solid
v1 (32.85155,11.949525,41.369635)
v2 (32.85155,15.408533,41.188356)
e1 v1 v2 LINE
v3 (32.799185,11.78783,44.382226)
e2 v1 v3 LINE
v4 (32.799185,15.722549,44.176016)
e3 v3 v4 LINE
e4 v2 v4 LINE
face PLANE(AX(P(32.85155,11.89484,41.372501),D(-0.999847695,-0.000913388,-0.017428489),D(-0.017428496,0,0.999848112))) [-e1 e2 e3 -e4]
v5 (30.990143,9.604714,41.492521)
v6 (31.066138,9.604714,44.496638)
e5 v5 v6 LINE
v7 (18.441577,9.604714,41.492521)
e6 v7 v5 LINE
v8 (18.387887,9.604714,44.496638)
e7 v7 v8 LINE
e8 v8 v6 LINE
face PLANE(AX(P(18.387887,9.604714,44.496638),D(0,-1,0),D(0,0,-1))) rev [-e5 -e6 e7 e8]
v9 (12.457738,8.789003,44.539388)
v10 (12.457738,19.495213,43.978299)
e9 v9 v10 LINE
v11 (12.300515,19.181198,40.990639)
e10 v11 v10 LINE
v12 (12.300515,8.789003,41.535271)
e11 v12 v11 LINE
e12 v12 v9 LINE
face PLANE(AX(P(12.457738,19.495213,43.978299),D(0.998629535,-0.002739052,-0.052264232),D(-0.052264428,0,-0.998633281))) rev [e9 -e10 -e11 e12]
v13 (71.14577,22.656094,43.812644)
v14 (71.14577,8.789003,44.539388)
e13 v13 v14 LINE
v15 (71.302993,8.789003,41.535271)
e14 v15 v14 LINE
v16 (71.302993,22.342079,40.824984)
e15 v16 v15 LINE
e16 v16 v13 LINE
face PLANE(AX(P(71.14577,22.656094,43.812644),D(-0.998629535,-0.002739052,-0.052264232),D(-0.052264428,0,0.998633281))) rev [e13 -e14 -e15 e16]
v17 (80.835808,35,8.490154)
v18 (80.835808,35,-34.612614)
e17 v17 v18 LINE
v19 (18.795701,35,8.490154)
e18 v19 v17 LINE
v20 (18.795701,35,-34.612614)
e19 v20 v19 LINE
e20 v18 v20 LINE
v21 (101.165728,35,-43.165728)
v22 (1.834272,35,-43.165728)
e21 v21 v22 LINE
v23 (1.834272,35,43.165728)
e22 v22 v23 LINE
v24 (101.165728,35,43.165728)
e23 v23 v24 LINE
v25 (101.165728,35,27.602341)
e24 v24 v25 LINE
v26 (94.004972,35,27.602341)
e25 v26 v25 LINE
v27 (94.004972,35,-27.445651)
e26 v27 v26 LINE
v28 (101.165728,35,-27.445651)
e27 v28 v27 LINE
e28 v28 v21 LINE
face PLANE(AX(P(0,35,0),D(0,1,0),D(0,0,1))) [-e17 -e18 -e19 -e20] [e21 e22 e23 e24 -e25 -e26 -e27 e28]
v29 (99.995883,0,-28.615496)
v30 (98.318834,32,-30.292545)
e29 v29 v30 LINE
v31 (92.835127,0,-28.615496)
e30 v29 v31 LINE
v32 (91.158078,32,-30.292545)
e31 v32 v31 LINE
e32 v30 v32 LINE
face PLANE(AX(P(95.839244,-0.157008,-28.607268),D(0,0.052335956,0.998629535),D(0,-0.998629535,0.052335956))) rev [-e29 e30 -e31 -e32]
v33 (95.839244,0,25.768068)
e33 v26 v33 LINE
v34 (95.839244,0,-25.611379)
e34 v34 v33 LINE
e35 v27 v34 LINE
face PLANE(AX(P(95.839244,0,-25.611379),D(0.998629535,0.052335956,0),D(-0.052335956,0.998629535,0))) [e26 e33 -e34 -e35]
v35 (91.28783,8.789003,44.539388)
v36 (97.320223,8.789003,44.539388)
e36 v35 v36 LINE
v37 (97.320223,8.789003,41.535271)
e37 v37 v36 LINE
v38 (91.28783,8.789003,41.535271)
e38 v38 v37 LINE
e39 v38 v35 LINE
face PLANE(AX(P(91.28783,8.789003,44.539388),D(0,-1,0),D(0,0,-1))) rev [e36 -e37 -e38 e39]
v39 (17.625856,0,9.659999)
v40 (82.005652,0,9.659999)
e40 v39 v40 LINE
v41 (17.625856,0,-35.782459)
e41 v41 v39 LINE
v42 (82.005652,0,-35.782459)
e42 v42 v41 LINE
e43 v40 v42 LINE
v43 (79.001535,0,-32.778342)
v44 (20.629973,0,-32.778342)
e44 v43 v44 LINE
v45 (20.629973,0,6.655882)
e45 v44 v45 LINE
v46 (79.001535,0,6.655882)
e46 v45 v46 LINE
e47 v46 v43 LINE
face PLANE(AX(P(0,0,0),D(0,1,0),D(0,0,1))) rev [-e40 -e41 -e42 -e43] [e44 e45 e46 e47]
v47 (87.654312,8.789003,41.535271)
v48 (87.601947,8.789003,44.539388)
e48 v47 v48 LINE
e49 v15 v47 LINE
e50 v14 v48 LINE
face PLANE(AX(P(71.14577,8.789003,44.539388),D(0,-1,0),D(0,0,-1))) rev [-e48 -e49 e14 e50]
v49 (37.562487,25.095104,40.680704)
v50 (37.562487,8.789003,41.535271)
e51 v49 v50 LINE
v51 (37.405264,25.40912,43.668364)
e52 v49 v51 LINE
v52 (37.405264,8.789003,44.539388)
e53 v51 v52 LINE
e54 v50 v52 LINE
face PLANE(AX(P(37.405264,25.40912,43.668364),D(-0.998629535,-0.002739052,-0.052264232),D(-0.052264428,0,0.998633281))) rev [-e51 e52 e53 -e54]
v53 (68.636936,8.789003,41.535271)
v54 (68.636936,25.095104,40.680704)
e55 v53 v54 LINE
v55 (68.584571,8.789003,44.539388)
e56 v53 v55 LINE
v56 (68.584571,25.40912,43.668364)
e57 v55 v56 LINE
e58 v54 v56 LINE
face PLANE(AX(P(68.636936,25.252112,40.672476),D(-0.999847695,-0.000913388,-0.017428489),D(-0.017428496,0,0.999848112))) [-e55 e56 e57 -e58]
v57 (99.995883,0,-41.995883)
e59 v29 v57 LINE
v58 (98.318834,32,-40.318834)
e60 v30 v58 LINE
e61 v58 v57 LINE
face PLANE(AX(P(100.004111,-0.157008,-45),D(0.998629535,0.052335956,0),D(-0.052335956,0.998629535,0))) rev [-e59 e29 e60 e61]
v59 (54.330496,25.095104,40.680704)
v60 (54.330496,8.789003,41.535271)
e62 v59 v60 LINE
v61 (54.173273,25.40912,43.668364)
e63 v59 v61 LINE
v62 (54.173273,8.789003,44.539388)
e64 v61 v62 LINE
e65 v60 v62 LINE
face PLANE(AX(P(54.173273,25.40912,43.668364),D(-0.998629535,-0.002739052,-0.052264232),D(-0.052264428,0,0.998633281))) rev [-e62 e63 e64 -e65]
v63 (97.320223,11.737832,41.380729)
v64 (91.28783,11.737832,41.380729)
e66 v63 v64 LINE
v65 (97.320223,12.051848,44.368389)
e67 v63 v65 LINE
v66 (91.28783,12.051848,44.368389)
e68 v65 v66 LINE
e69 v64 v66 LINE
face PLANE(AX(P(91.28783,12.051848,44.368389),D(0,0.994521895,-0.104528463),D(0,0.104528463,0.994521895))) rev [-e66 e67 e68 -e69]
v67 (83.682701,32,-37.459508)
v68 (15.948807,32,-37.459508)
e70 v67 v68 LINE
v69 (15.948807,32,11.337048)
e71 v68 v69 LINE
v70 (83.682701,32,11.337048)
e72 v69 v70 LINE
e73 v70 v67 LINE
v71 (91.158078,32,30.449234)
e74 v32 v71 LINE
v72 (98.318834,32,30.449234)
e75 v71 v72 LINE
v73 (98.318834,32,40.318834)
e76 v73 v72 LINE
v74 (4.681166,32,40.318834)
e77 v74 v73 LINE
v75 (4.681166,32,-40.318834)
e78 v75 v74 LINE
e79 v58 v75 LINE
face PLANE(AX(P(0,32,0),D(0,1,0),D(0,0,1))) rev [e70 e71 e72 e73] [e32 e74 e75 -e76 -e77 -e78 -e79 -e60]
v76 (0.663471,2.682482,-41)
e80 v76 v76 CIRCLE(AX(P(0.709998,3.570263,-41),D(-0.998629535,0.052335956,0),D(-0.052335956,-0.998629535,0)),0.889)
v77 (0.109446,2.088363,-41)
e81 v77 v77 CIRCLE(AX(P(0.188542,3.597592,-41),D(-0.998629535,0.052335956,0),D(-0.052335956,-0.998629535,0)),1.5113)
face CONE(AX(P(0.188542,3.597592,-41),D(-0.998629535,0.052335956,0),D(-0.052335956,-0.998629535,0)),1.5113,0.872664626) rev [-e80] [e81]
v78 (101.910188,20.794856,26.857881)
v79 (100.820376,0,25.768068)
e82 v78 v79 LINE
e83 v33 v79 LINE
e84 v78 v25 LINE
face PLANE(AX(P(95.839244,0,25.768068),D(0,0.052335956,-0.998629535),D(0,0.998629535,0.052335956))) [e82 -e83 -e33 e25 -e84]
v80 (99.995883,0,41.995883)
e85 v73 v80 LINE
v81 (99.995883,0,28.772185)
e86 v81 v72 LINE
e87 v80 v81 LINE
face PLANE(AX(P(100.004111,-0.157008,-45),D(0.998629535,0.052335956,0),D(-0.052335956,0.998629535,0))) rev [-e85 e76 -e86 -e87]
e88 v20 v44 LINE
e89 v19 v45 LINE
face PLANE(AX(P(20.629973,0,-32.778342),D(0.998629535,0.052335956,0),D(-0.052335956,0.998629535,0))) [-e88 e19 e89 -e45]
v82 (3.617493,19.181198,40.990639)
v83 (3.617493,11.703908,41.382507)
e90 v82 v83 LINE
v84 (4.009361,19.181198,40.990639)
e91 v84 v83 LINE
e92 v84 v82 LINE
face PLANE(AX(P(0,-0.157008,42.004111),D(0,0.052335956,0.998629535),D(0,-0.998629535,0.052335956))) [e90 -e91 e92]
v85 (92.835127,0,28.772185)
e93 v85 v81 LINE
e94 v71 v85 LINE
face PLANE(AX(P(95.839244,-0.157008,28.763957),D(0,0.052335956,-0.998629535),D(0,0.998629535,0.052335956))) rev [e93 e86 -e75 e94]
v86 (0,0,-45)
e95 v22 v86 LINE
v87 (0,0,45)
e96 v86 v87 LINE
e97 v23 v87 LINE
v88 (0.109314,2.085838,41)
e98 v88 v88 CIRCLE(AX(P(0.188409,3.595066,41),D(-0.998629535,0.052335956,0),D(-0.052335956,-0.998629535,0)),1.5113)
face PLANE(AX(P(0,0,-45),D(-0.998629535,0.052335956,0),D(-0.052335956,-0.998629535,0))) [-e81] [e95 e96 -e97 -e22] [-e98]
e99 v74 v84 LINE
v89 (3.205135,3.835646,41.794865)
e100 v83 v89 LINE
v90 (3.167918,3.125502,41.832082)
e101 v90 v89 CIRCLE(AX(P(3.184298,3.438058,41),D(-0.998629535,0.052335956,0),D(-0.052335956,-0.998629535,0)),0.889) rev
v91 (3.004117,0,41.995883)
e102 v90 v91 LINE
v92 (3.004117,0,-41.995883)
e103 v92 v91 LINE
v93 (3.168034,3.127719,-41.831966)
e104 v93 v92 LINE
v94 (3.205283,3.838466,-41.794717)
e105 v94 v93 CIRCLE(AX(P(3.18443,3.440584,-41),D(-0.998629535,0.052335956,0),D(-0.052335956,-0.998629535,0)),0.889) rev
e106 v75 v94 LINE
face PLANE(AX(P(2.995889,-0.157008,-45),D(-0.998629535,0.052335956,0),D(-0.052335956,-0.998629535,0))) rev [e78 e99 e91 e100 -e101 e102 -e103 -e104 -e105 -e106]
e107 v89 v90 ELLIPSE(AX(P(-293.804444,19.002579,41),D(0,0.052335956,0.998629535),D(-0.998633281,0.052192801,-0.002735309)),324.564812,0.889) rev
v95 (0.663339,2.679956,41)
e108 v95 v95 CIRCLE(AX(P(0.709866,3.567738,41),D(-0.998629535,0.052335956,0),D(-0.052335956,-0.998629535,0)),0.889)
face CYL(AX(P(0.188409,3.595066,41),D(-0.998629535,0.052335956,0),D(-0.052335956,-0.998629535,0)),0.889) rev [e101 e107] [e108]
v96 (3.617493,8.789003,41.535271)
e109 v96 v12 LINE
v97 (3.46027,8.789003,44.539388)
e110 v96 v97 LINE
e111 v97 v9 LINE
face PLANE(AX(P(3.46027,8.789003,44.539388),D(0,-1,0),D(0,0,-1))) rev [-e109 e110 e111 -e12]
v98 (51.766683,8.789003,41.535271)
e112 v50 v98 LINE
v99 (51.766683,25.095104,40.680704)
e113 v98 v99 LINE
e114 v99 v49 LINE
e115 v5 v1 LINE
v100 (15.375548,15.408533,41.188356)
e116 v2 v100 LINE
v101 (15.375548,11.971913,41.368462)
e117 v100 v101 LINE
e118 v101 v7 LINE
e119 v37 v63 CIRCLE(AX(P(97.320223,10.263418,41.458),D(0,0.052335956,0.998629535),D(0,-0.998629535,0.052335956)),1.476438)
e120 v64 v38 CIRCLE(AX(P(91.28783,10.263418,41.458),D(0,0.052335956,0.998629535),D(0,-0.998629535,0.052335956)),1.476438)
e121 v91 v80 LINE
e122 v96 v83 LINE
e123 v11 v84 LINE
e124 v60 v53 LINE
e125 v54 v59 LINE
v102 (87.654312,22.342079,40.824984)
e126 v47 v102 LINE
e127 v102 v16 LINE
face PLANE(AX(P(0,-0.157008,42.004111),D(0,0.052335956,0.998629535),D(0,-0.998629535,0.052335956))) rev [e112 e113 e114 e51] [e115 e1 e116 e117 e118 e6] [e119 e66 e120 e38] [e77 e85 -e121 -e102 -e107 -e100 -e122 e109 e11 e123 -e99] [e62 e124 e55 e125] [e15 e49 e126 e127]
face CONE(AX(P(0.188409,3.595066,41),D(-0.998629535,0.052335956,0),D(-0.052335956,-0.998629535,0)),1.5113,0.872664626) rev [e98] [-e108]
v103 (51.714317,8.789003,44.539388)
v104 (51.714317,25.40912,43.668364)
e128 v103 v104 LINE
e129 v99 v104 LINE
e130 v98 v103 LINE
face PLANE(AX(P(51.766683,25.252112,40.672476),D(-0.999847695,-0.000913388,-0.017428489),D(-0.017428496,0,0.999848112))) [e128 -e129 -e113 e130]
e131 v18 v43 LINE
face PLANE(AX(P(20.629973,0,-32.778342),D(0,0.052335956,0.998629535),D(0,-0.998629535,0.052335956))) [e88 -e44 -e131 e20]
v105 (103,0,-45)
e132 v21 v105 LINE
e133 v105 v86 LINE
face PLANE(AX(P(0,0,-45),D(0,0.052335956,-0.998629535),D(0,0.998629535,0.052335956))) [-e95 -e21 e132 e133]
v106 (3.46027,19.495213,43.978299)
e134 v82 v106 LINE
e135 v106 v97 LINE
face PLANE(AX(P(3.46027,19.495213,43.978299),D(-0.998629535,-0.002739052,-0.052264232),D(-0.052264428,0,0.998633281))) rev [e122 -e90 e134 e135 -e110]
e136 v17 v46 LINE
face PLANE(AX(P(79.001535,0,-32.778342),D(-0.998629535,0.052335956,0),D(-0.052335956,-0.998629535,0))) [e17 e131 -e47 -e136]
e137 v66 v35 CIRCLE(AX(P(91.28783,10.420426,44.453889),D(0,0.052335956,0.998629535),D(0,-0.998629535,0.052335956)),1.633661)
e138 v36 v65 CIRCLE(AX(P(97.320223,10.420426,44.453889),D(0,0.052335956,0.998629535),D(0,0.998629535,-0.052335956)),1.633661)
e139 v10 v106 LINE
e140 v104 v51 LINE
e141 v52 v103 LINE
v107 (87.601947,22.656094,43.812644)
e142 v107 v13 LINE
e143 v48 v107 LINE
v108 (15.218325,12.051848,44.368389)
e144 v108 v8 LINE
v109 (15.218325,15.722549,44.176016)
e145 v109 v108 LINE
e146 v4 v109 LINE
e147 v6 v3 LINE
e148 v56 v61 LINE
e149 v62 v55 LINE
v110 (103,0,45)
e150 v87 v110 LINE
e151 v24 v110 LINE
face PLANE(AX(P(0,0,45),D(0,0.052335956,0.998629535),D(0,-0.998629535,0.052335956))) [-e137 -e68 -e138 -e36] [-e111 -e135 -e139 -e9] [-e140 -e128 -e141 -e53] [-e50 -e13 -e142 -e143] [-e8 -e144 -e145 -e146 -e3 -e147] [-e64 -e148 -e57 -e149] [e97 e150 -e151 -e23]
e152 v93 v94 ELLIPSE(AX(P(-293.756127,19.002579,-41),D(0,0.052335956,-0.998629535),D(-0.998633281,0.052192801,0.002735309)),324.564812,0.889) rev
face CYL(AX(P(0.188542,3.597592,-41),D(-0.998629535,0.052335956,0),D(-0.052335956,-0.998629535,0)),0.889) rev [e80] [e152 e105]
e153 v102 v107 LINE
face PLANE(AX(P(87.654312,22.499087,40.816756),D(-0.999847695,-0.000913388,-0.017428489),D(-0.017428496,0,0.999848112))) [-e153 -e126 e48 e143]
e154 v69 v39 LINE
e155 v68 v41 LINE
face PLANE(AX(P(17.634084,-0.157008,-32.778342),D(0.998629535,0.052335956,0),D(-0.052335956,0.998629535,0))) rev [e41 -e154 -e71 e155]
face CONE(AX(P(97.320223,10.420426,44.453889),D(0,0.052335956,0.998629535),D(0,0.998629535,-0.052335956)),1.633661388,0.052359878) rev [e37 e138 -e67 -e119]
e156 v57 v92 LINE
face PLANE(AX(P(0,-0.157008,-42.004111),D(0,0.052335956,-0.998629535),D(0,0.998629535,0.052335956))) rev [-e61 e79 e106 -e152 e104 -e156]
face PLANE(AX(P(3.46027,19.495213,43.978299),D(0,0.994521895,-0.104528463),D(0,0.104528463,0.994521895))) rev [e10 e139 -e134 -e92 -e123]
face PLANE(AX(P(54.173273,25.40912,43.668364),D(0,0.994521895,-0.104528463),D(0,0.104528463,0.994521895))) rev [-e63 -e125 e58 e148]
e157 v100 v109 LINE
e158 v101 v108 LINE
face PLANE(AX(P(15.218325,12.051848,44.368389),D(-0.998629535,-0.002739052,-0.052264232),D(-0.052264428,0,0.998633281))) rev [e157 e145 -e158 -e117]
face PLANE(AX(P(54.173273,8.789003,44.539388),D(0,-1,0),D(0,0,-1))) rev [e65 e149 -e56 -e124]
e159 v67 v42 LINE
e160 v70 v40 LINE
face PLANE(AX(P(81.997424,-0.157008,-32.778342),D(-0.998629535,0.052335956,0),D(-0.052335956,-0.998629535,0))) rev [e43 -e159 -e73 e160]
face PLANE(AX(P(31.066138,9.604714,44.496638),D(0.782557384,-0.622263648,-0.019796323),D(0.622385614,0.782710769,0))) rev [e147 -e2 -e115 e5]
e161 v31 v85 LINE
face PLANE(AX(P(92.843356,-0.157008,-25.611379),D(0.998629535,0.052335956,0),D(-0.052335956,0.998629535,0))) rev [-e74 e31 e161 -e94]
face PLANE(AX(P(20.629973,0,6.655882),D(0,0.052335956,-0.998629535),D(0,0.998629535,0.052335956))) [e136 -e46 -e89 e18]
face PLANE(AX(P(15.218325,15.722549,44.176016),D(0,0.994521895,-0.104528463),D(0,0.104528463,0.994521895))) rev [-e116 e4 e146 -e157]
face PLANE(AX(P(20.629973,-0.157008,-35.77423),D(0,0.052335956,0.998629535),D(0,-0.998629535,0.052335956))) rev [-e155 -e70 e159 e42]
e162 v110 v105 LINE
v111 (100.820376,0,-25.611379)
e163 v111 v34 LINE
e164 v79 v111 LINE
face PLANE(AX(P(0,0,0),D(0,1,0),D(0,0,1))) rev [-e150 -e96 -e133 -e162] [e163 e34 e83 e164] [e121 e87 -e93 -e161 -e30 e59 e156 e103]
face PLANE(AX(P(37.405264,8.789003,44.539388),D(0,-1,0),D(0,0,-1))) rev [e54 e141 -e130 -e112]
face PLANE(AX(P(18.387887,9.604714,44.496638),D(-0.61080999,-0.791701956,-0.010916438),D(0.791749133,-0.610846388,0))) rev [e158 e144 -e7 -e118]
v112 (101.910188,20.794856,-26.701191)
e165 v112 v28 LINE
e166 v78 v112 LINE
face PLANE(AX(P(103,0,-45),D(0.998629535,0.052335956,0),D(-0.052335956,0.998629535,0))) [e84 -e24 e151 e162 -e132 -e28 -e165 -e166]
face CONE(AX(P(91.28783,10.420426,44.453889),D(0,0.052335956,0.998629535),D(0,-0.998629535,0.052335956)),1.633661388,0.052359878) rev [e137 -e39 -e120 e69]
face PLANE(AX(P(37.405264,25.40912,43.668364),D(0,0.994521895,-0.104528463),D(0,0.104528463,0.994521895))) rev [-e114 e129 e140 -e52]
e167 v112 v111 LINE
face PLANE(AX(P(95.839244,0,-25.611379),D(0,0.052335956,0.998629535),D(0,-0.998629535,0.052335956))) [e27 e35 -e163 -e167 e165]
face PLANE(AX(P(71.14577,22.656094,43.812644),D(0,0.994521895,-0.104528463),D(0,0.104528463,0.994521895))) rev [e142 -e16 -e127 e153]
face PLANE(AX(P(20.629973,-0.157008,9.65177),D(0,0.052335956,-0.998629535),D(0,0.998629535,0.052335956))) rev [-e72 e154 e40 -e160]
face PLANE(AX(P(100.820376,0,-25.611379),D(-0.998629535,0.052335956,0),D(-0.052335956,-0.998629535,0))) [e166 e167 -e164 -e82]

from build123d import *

# Parameters (mm, degrees)
SKETCH2_W                                         = 103
SKETCH2_H                                         = 90
SKETCH2_W_2                                       = 4.981131341
SKETCH2_H_2                                       = 51.379447355
SKETCH2_W_3                                       = 58.371562284
SKETCH2_H_3                                       = 39.434223375
BOSS_EXTRUDE2_DEPTH                               = 35
BOSS_EXTRUDE2_TAPER                               = 3
SHELL2_OUTLINE_W                                  = 67.733894234
SHELL2_OUTLINE_H                                  = 48.796555325
SHELL2_DEPTH                                      = 32
SHELL2_DRAFT                                      = 3
SKETCH11_W                                        = 8.997468353
SKETCH11_H                                        = 10.72090286
CUT_EXTRUDE2_DEPTH                                = 3
CUT_EXTRUDE2_DRAFT                                = -3
SKETCH11_W_2                                      = 14.518642115
SKETCH11_H_2                                      = 16.642925392
CUT_EXTRUDE2_PROFILE_2_DEPTH                      = 3
CUT_EXTRUDE2_PROFILE_2_DRAFT                      = -3
SKETCH11_W_3                                      = 14.620886073
CUT_EXTRUDE2_PROFILE_3_DEPTH                      = 3
CUT_EXTRUDE2_PROFILE_3_DRAFT                      = -3
SKETCH11_W_4                                      = 16.665765244
SKETCH11_H_3                                      = 13.8861218
CUT_EXTRUDE2_PROFILE_4_DEPTH                      = 3
CUT_EXTRUDE2_PROFILE_4_DRAFT                      = -3
CUT_EXTRUDE2_PROFILE_5_DEPTH                      = 3
CUT_EXTRUDE2_PROFILE_5_DRAFT                      = -3
CUT_EXTRUDE2_PROFILE_6_DEPTH                      = 3
CUT_EXTRUDE2_PROFILE_6_DRAFT                      = -3
CSK_FOR_0_FLAT_HEAD_MACHINE_SCREW_100_D           = 1.778
CSK_FOR_0_FLAT_HEAD_MACHINE_SCREW_100_CSINK_D     = 3.0226
CSK_FOR_0_FLAT_HEAD_MACHINE_SCREW_100_CSINK_ANGLE = 100
CSK_FOR_0_FLAT_HEAD_MACHINE_SCREW_2_D             = 1.778
CSK_FOR_0_FLAT_HEAD_MACHINE_SCREW_2_CSINK_D       = 3.0226
CSK_FOR_0_FLAT_HEAD_MACHINE_SCREW_2_CSINK_ANGLE   = 100
DRAFT4_START                                      = 5
DRAFT4_DEPTH                                      = 19


with BuildPart() as part:
    # Sketch2 → Boss-Extrude2 (new body)
    with BuildSketch(Plane(origin=(0, 0, 0), x_dir=(1, 0, 0), z_dir=(0, 1, 0))):
        with Locations((51.5, 0)):
            Rectangle(SKETCH2_W, SKETCH2_H)
        with Locations((98.329809834, -0.07834477)):
            Rectangle(SKETCH2_W_2, SKETCH2_H_2, mode=Mode.SUBTRACT)
        with Locations((49.815754183, 13.061230018)):
            Rectangle(SKETCH2_W_3, SKETCH2_H_3, mode=Mode.SUBTRACT)
    extrude(amount=BOSS_EXTRUDE2_DEPTH, taper=BOSS_EXTRUDE2_TAPER)


with BuildPart() as shell2_tool:
    # Shell2: read off the stored shape, not the designer's step
    # Shell2 outline → Shell2 (with draft: the straight prism first)
    with BuildSketch(Plane(origin=(0, 32, 0), x_dir=(1, 0, 0), z_dir=(0, 1, 0))):
        Polygon((98.318834025, -30.449234423), (91.158078188, -30.449234423), (91.158078188, 30.292544882), (98.318834025, 30.292544882), (98.318834025, 40.318834025), (4.681165975, 40.318834025), (4.681165975, -40.318834025), (98.318834025, -40.318834025), align=None)
        with Locations((49.815754183, 13.061230019)):
            Rectangle(SHELL2_OUTLINE_W, SHELL2_OUTLINE_H, mode=Mode.SUBTRACT)
    extrude(amount=-SHELL2_DEPTH)
    # Shell2: the draft: its side faces are tilted about the plane it starts from
    shell2_sides = [shell2_tool.faces().sort_by_distance(p)[0] for p in [
        (94.738456106, 16, 30.449234423),
        (91.158078188, 16, 0.07834477),
        (94.738456107, 16, -30.292544882),
        (98.318834025, 16, -35.305689454),
        (51.5, 16, -40.318834025),
        (4.681165975, 16, 0),
        (51.5, 16, 40.318834025),
        (98.318834025, 16, 35.384034224),
        (15.948807066, 16, -13.061230018),
        (49.815754183, 16, -37.459507681),
        (83.6827013, 16, -13.061230018),
        (49.815754183, 16, 11.337047644),
    ]]
    draft(shell2_sides, Plane(origin=(0, 32, 0), x_dir=(1, 0, 0), z_dir=(0, 1, 0)), SHELL2_DRAFT)


with BuildPart() as part_1:
    add(part.part)

    # Shell2: cut by shell2_tool
    add(shell2_tool.part, mode=Mode.SUBTRACT)


with BuildPart() as cut_extrude2_tool:
    # Sketch11 → Cut-Extrude2 (with draft: the straight prism first)
    with BuildSketch(Plane(origin=(0, 2.351890424, 44.876742646), x_dir=(1, 0, 0), z_dir=(0, 0.0523359562429439, 0.998629534754574))):
        with Locations((7.959003718, 11.806398056)):
            Rectangle(SKETCH11_W, SKETCH11_H)
    extrude(amount=-CUT_EXTRUDE2_DEPTH)
    # Cut-Extrude2: the draft: its side faces are tilted about the plane it starts from
    cut_extrude2_sides = [cut_extrude2_tool.faces().sort_by_distance(p)[0] for p in [
        (3.460269541, 14.063604287, 42.760899212),
        (7.959003718, 8.710499169, 43.041443563),
        (12.457737894, 14.063604287, 42.760899212),
        (7.959003718, 19.416709405, 42.48035486),
    ]]
    draft(cut_extrude2_sides, Plane(origin=(0, 2.351890424, 44.876742646), x_dir=(1, 0, 0), z_dir=(0, 0.0523359562429439, 0.998629534754574)), CUT_EXTRUDE2_DRAFT)


with BuildPart() as part_2:
    add(part_1.part)

    # Cut-Extrude2: cut by cut_extrude2_tool
    add(cut_extrude2_tool.part, mode=Mode.SUBTRACT)


with BuildPart() as cut_extrude2_profile_2_tool:
    # Sketch11 → Cut-Extrude2 profile 2 (with draft: the straight prism first)
    with BuildSketch(Plane(origin=(0, 2.351890424, 44.876742646), x_dir=(1, 0, 0), z_dir=(0, 0.0523359562429439, 0.998629534754574))):
        with Locations((44.664584839, 14.767409322)):
            Rectangle(SKETCH11_W_2, SKETCH11_H_2)
    extrude(amount=-CUT_EXTRUDE2_PROFILE_2_DEPTH)
    # Cut-Extrude2 profile 2: the draft: its side faces are tilted about the plane it starts from
    cut_extrude2_profile_2_sides = [cut_extrude2_profile_2_tool.faces().sort_by_distance(p)[0] for p in [
        (37.405263781, 17.02055759, 42.605931856),
        (44.664584839, 8.710499169, 43.041443563),
        (51.923905896, 17.02055759, 42.605931856),
        (44.664584839, 25.330616011, 42.170420148),
    ]]
    draft(cut_extrude2_profile_2_sides, Plane(origin=(0, 2.351890424, 44.876742646), x_dir=(1, 0, 0), z_dir=(0, 0.0523359562429439, 0.998629534754574)), CUT_EXTRUDE2_PROFILE_2_DRAFT)


with BuildPart() as part_3:
    add(part_2.part)

    # Cut-Extrude2 profile 2: cut by cut_extrude2_profile_2_tool
    add(cut_extrude2_profile_2_tool.part, mode=Mode.SUBTRACT)


with BuildPart() as cut_extrude2_profile_3_tool:
    # Sketch11 → Cut-Extrude2 profile 3 (with draft: the straight prism first)
    with BuildSketch(Plane(origin=(0, 2.351890424, 44.876742646), x_dir=(1, 0, 0), z_dir=(0, 0.0523359562429439, 0.998629534754574))):
        with Locations((61.48371602, 14.767409322)):
            Rectangle(SKETCH11_W_3, SKETCH11_H_2)
    extrude(amount=-CUT_EXTRUDE2_PROFILE_3_DEPTH)
    # Cut-Extrude2 profile 3: the draft: its side faces are tilted about the plane it starts from
    cut_extrude2_profile_3_sides = [cut_extrude2_profile_3_tool.faces().sort_by_distance(p)[0] for p in [
        (54.173272984, 17.02055759, 42.605931856),
        (61.483716021, 8.710499169, 43.041443563),
        (68.794159057, 17.02055759, 42.605931856),
        (61.483716021, 25.330616011, 42.170420148),
    ]]
    draft(cut_extrude2_profile_3_sides, Plane(origin=(0, 2.351890424, 44.876742646), x_dir=(1, 0, 0), z_dir=(0, 0.0523359562429439, 0.998629534754574)), CUT_EXTRUDE2_PROFILE_3_DRAFT)


with BuildPart() as part_4:
    add(part_3.part)

    # Cut-Extrude2 profile 3: cut by cut_extrude2_profile_3_tool
    add(cut_extrude2_profile_3_tool.part, mode=Mode.SUBTRACT)


with BuildPart() as cut_extrude2_profile_4_tool:
    # Sketch11 → Cut-Extrude2 profile 4 (with draft: the straight prism first)
    with BuildSketch(Plane(origin=(0, 2.351890424, 44.876742646), x_dir=(1, 0, 0), z_dir=(0, 0.0523359562429439, 0.998629534754574))):
        with Locations((79.478652726, 13.389007526)):
            Rectangle(SKETCH11_W_4, SKETCH11_H_3)
    extrude(amount=-CUT_EXTRUDE2_PROFILE_4_DEPTH)
    # Cut-Extrude2 profile 4: the draft: its side faces are tilted about the plane it starts from
    cut_extrude2_profile_4_sides = [cut_extrude2_profile_4_tool.faces().sort_by_distance(p)[0] for p in [
        (71.145770104, 15.644044846, 42.678071832),
        (79.478652726, 8.710499169, 43.041443563),
        (87.811535348, 15.644044846, 42.678071832),
        (79.478652726, 22.577590522, 42.3147001),
    ]]
    draft(cut_extrude2_profile_4_sides, Plane(origin=(0, 2.351890424, 44.876742646), x_dir=(1, 0, 0), z_dir=(0, 0.0523359562429439, 0.998629534754574)), CUT_EXTRUDE2_PROFILE_4_DRAFT)


with BuildPart() as part_5:
    add(part_4.part)

    # Cut-Extrude2 profile 4: cut by cut_extrude2_profile_4_tool
    add(cut_extrude2_profile_4_tool.part, mode=Mode.SUBTRACT)


with BuildPart() as cut_extrude2_profile_5_tool:
    # Sketch11 → Cut-Extrude2 profile 5 (with draft: the straight prism first)
    with BuildSketch(Plane(origin=(0, 2.351890424, 44.876742646), x_dir=(1, 0, 0), z_dir=(0, 0.0523359562429439, 0.998629534754574))):
        Polygon((18.38788749, 7.26277732), (31.066138351, 7.26277732), (33.008773563, 9.713269403), (33.008773563, 13.389007526), (15.218324775, 13.389007526), (15.218324775, 9.713269403), align=None)
    extrude(amount=-CUT_EXTRUDE2_PROFILE_5_DEPTH)
    # Cut-Extrude2 profile 5: the draft: its side faces are tilted about the plane it starts from
    cut_extrude2_profile_5_sides = [cut_extrude2_profile_5_tool.faces().sort_by_distance(p)[0] for p in [
        (24.727012921, 9.526210425, 42.998693948),
        (32.037455957, 10.74977731, 42.934569524),
        (33.008773563, 13.80869452, 42.774258466),
        (24.113549169, 15.644044846, 42.678071832),
        (15.218324775, 13.80869452, 42.774258466),
        (16.803106133, 10.74977731, 42.934569524),
    ]]
    draft(cut_extrude2_profile_5_sides, Plane(origin=(0, 2.351890424, 44.876742646), x_dir=(1, 0, 0), z_dir=(0, 0.0523359562429439, 0.998629534754574)), CUT_EXTRUDE2_PROFILE_5_DRAFT)


with BuildPart() as part_6:
    add(part_5.part)

    # Cut-Extrude2 profile 5: cut by cut_extrude2_profile_5_tool
    add(cut_extrude2_profile_5_tool.part, mode=Mode.SUBTRACT)


with BuildPart() as cut_extrude2_profile_6_tool:
    # Sketch11 → Cut-Extrude2 profile 6 (with draft: the straight prism first)
    with BuildSketch(Plane(origin=(0, 2.351890424, 44.876742646), x_dir=(1, 0, 0), z_dir=(0, 0.0523359562429439, 0.998629534754574))):
        with BuildLine():
            ThreePointArc((91.287829939, 9.713269403), (89.654168551, 8.079608014), (91.287829939, 6.445946626))
            Line((91.287829939, 6.445946626), (97.320223494, 6.445946626))
            ThreePointArc((97.320223494, 6.445946626), (98.953884882, 8.079608014), (97.320223494, 9.713269403))
            Line((97.320223494, 9.713269403), (91.287829939, 9.713269403))
        make_face()
    extrude(amount=-CUT_EXTRUDE2_PROFILE_6_DEPTH)
    # Cut-Extrude2 profile 6: the draft: its side faces are tilted about the plane it starts from
    cut_extrude2_profile_6_sides = [cut_extrude2_profile_6_tool.faces().sort_by_distance(p)[0] for p in [
        (94.304026716, 11.973344194, 42.870445101),
        (89.654168551, 10.341921681, 42.955944332),
        (94.304026716, 8.710499169, 43.041443563),
        (98.953884882, 10.341921681, 42.955944332),
    ]]
    draft(cut_extrude2_profile_6_sides, Plane(origin=(0, 2.351890424, 44.876742646), x_dir=(1, 0, 0), z_dir=(0, 0.0523359562429439, 0.998629534754574)), CUT_EXTRUDE2_PROFILE_6_DRAFT)


with BuildPart() as part_7:
    add(part_6.part)

    # Cut-Extrude2 profile 6: cut by cut_extrude2_profile_6_tool
    add(cut_extrude2_profile_6_tool.part, mode=Mode.SUBTRACT)

    # CSK for _0 Flat Head Machine Screw _100 (through all)
    with Locations(Plane(origin=(0.188541787, 3.597591615, -41), x_dir=(-0.052335956243, -0.998629534755, 0), z_dir=(-0.998629534755, 0.052335956243, 0))):
        with Locations((0, 0), (0.002528755, 82)):
            CounterSinkHole(CSK_FOR_0_FLAT_HEAD_MACHINE_SCREW_100_D / 2, CSK_FOR_0_FLAT_HEAD_MACHINE_SCREW_100_CSINK_D / 2, counter_sink_angle=CSK_FOR_0_FLAT_HEAD_MACHINE_SCREW_100_CSINK_ANGLE)

    # CSK for _0 Flat Head Machine Screw _ 2 (through all)
    with Locations(Plane(origin=(0.188541787, 3.597591615, -41), x_dir=(-0.052335956243, -0.998629534755, 0), z_dir=(-0.998629534755, 0.052335956243, 0))):
        with Locations((0, 0), (0.002528755, 82)):
            CounterSinkHole(CSK_FOR_0_FLAT_HEAD_MACHINE_SCREW_2_D / 2, CSK_FOR_0_FLAT_HEAD_MACHINE_SCREW_2_CSINK_D / 2, counter_sink_angle=CSK_FOR_0_FLAT_HEAD_MACHINE_SCREW_2_CSINK_ANGLE)

    # Draft4: read off the stored shape, not the designer's step
    # Draft4 outline → Draft4 (add)
    with BuildSketch(Plane(origin=(0, 0, 0), x_dir=(1, 0, 0), z_dir=(0, 0.9986295347545739, -0.052335956242943814)).offset(DRAFT4_START)):
        Polygon((51.923905896, -44.938329064), (51.766682558, -41.938329064), (51.714317363, -44.938329064), align=None)
        Polygon((87.65431201, -41.938329064), (87.601946816, -44.938329064), (87.811535348, -44.938329064), align=None)
        Polygon((68.636935719, -41.938329064), (68.584570525, -44.938329064), (68.794159057, -44.938329064), align=None)
        Polygon((32.799185031, -44.938329064), (33.008773563, -44.938329064), (32.851550226, -41.938329064), align=None)
    extrude(amount=DRAFT4_DEPTH)


solid = part_7.part
